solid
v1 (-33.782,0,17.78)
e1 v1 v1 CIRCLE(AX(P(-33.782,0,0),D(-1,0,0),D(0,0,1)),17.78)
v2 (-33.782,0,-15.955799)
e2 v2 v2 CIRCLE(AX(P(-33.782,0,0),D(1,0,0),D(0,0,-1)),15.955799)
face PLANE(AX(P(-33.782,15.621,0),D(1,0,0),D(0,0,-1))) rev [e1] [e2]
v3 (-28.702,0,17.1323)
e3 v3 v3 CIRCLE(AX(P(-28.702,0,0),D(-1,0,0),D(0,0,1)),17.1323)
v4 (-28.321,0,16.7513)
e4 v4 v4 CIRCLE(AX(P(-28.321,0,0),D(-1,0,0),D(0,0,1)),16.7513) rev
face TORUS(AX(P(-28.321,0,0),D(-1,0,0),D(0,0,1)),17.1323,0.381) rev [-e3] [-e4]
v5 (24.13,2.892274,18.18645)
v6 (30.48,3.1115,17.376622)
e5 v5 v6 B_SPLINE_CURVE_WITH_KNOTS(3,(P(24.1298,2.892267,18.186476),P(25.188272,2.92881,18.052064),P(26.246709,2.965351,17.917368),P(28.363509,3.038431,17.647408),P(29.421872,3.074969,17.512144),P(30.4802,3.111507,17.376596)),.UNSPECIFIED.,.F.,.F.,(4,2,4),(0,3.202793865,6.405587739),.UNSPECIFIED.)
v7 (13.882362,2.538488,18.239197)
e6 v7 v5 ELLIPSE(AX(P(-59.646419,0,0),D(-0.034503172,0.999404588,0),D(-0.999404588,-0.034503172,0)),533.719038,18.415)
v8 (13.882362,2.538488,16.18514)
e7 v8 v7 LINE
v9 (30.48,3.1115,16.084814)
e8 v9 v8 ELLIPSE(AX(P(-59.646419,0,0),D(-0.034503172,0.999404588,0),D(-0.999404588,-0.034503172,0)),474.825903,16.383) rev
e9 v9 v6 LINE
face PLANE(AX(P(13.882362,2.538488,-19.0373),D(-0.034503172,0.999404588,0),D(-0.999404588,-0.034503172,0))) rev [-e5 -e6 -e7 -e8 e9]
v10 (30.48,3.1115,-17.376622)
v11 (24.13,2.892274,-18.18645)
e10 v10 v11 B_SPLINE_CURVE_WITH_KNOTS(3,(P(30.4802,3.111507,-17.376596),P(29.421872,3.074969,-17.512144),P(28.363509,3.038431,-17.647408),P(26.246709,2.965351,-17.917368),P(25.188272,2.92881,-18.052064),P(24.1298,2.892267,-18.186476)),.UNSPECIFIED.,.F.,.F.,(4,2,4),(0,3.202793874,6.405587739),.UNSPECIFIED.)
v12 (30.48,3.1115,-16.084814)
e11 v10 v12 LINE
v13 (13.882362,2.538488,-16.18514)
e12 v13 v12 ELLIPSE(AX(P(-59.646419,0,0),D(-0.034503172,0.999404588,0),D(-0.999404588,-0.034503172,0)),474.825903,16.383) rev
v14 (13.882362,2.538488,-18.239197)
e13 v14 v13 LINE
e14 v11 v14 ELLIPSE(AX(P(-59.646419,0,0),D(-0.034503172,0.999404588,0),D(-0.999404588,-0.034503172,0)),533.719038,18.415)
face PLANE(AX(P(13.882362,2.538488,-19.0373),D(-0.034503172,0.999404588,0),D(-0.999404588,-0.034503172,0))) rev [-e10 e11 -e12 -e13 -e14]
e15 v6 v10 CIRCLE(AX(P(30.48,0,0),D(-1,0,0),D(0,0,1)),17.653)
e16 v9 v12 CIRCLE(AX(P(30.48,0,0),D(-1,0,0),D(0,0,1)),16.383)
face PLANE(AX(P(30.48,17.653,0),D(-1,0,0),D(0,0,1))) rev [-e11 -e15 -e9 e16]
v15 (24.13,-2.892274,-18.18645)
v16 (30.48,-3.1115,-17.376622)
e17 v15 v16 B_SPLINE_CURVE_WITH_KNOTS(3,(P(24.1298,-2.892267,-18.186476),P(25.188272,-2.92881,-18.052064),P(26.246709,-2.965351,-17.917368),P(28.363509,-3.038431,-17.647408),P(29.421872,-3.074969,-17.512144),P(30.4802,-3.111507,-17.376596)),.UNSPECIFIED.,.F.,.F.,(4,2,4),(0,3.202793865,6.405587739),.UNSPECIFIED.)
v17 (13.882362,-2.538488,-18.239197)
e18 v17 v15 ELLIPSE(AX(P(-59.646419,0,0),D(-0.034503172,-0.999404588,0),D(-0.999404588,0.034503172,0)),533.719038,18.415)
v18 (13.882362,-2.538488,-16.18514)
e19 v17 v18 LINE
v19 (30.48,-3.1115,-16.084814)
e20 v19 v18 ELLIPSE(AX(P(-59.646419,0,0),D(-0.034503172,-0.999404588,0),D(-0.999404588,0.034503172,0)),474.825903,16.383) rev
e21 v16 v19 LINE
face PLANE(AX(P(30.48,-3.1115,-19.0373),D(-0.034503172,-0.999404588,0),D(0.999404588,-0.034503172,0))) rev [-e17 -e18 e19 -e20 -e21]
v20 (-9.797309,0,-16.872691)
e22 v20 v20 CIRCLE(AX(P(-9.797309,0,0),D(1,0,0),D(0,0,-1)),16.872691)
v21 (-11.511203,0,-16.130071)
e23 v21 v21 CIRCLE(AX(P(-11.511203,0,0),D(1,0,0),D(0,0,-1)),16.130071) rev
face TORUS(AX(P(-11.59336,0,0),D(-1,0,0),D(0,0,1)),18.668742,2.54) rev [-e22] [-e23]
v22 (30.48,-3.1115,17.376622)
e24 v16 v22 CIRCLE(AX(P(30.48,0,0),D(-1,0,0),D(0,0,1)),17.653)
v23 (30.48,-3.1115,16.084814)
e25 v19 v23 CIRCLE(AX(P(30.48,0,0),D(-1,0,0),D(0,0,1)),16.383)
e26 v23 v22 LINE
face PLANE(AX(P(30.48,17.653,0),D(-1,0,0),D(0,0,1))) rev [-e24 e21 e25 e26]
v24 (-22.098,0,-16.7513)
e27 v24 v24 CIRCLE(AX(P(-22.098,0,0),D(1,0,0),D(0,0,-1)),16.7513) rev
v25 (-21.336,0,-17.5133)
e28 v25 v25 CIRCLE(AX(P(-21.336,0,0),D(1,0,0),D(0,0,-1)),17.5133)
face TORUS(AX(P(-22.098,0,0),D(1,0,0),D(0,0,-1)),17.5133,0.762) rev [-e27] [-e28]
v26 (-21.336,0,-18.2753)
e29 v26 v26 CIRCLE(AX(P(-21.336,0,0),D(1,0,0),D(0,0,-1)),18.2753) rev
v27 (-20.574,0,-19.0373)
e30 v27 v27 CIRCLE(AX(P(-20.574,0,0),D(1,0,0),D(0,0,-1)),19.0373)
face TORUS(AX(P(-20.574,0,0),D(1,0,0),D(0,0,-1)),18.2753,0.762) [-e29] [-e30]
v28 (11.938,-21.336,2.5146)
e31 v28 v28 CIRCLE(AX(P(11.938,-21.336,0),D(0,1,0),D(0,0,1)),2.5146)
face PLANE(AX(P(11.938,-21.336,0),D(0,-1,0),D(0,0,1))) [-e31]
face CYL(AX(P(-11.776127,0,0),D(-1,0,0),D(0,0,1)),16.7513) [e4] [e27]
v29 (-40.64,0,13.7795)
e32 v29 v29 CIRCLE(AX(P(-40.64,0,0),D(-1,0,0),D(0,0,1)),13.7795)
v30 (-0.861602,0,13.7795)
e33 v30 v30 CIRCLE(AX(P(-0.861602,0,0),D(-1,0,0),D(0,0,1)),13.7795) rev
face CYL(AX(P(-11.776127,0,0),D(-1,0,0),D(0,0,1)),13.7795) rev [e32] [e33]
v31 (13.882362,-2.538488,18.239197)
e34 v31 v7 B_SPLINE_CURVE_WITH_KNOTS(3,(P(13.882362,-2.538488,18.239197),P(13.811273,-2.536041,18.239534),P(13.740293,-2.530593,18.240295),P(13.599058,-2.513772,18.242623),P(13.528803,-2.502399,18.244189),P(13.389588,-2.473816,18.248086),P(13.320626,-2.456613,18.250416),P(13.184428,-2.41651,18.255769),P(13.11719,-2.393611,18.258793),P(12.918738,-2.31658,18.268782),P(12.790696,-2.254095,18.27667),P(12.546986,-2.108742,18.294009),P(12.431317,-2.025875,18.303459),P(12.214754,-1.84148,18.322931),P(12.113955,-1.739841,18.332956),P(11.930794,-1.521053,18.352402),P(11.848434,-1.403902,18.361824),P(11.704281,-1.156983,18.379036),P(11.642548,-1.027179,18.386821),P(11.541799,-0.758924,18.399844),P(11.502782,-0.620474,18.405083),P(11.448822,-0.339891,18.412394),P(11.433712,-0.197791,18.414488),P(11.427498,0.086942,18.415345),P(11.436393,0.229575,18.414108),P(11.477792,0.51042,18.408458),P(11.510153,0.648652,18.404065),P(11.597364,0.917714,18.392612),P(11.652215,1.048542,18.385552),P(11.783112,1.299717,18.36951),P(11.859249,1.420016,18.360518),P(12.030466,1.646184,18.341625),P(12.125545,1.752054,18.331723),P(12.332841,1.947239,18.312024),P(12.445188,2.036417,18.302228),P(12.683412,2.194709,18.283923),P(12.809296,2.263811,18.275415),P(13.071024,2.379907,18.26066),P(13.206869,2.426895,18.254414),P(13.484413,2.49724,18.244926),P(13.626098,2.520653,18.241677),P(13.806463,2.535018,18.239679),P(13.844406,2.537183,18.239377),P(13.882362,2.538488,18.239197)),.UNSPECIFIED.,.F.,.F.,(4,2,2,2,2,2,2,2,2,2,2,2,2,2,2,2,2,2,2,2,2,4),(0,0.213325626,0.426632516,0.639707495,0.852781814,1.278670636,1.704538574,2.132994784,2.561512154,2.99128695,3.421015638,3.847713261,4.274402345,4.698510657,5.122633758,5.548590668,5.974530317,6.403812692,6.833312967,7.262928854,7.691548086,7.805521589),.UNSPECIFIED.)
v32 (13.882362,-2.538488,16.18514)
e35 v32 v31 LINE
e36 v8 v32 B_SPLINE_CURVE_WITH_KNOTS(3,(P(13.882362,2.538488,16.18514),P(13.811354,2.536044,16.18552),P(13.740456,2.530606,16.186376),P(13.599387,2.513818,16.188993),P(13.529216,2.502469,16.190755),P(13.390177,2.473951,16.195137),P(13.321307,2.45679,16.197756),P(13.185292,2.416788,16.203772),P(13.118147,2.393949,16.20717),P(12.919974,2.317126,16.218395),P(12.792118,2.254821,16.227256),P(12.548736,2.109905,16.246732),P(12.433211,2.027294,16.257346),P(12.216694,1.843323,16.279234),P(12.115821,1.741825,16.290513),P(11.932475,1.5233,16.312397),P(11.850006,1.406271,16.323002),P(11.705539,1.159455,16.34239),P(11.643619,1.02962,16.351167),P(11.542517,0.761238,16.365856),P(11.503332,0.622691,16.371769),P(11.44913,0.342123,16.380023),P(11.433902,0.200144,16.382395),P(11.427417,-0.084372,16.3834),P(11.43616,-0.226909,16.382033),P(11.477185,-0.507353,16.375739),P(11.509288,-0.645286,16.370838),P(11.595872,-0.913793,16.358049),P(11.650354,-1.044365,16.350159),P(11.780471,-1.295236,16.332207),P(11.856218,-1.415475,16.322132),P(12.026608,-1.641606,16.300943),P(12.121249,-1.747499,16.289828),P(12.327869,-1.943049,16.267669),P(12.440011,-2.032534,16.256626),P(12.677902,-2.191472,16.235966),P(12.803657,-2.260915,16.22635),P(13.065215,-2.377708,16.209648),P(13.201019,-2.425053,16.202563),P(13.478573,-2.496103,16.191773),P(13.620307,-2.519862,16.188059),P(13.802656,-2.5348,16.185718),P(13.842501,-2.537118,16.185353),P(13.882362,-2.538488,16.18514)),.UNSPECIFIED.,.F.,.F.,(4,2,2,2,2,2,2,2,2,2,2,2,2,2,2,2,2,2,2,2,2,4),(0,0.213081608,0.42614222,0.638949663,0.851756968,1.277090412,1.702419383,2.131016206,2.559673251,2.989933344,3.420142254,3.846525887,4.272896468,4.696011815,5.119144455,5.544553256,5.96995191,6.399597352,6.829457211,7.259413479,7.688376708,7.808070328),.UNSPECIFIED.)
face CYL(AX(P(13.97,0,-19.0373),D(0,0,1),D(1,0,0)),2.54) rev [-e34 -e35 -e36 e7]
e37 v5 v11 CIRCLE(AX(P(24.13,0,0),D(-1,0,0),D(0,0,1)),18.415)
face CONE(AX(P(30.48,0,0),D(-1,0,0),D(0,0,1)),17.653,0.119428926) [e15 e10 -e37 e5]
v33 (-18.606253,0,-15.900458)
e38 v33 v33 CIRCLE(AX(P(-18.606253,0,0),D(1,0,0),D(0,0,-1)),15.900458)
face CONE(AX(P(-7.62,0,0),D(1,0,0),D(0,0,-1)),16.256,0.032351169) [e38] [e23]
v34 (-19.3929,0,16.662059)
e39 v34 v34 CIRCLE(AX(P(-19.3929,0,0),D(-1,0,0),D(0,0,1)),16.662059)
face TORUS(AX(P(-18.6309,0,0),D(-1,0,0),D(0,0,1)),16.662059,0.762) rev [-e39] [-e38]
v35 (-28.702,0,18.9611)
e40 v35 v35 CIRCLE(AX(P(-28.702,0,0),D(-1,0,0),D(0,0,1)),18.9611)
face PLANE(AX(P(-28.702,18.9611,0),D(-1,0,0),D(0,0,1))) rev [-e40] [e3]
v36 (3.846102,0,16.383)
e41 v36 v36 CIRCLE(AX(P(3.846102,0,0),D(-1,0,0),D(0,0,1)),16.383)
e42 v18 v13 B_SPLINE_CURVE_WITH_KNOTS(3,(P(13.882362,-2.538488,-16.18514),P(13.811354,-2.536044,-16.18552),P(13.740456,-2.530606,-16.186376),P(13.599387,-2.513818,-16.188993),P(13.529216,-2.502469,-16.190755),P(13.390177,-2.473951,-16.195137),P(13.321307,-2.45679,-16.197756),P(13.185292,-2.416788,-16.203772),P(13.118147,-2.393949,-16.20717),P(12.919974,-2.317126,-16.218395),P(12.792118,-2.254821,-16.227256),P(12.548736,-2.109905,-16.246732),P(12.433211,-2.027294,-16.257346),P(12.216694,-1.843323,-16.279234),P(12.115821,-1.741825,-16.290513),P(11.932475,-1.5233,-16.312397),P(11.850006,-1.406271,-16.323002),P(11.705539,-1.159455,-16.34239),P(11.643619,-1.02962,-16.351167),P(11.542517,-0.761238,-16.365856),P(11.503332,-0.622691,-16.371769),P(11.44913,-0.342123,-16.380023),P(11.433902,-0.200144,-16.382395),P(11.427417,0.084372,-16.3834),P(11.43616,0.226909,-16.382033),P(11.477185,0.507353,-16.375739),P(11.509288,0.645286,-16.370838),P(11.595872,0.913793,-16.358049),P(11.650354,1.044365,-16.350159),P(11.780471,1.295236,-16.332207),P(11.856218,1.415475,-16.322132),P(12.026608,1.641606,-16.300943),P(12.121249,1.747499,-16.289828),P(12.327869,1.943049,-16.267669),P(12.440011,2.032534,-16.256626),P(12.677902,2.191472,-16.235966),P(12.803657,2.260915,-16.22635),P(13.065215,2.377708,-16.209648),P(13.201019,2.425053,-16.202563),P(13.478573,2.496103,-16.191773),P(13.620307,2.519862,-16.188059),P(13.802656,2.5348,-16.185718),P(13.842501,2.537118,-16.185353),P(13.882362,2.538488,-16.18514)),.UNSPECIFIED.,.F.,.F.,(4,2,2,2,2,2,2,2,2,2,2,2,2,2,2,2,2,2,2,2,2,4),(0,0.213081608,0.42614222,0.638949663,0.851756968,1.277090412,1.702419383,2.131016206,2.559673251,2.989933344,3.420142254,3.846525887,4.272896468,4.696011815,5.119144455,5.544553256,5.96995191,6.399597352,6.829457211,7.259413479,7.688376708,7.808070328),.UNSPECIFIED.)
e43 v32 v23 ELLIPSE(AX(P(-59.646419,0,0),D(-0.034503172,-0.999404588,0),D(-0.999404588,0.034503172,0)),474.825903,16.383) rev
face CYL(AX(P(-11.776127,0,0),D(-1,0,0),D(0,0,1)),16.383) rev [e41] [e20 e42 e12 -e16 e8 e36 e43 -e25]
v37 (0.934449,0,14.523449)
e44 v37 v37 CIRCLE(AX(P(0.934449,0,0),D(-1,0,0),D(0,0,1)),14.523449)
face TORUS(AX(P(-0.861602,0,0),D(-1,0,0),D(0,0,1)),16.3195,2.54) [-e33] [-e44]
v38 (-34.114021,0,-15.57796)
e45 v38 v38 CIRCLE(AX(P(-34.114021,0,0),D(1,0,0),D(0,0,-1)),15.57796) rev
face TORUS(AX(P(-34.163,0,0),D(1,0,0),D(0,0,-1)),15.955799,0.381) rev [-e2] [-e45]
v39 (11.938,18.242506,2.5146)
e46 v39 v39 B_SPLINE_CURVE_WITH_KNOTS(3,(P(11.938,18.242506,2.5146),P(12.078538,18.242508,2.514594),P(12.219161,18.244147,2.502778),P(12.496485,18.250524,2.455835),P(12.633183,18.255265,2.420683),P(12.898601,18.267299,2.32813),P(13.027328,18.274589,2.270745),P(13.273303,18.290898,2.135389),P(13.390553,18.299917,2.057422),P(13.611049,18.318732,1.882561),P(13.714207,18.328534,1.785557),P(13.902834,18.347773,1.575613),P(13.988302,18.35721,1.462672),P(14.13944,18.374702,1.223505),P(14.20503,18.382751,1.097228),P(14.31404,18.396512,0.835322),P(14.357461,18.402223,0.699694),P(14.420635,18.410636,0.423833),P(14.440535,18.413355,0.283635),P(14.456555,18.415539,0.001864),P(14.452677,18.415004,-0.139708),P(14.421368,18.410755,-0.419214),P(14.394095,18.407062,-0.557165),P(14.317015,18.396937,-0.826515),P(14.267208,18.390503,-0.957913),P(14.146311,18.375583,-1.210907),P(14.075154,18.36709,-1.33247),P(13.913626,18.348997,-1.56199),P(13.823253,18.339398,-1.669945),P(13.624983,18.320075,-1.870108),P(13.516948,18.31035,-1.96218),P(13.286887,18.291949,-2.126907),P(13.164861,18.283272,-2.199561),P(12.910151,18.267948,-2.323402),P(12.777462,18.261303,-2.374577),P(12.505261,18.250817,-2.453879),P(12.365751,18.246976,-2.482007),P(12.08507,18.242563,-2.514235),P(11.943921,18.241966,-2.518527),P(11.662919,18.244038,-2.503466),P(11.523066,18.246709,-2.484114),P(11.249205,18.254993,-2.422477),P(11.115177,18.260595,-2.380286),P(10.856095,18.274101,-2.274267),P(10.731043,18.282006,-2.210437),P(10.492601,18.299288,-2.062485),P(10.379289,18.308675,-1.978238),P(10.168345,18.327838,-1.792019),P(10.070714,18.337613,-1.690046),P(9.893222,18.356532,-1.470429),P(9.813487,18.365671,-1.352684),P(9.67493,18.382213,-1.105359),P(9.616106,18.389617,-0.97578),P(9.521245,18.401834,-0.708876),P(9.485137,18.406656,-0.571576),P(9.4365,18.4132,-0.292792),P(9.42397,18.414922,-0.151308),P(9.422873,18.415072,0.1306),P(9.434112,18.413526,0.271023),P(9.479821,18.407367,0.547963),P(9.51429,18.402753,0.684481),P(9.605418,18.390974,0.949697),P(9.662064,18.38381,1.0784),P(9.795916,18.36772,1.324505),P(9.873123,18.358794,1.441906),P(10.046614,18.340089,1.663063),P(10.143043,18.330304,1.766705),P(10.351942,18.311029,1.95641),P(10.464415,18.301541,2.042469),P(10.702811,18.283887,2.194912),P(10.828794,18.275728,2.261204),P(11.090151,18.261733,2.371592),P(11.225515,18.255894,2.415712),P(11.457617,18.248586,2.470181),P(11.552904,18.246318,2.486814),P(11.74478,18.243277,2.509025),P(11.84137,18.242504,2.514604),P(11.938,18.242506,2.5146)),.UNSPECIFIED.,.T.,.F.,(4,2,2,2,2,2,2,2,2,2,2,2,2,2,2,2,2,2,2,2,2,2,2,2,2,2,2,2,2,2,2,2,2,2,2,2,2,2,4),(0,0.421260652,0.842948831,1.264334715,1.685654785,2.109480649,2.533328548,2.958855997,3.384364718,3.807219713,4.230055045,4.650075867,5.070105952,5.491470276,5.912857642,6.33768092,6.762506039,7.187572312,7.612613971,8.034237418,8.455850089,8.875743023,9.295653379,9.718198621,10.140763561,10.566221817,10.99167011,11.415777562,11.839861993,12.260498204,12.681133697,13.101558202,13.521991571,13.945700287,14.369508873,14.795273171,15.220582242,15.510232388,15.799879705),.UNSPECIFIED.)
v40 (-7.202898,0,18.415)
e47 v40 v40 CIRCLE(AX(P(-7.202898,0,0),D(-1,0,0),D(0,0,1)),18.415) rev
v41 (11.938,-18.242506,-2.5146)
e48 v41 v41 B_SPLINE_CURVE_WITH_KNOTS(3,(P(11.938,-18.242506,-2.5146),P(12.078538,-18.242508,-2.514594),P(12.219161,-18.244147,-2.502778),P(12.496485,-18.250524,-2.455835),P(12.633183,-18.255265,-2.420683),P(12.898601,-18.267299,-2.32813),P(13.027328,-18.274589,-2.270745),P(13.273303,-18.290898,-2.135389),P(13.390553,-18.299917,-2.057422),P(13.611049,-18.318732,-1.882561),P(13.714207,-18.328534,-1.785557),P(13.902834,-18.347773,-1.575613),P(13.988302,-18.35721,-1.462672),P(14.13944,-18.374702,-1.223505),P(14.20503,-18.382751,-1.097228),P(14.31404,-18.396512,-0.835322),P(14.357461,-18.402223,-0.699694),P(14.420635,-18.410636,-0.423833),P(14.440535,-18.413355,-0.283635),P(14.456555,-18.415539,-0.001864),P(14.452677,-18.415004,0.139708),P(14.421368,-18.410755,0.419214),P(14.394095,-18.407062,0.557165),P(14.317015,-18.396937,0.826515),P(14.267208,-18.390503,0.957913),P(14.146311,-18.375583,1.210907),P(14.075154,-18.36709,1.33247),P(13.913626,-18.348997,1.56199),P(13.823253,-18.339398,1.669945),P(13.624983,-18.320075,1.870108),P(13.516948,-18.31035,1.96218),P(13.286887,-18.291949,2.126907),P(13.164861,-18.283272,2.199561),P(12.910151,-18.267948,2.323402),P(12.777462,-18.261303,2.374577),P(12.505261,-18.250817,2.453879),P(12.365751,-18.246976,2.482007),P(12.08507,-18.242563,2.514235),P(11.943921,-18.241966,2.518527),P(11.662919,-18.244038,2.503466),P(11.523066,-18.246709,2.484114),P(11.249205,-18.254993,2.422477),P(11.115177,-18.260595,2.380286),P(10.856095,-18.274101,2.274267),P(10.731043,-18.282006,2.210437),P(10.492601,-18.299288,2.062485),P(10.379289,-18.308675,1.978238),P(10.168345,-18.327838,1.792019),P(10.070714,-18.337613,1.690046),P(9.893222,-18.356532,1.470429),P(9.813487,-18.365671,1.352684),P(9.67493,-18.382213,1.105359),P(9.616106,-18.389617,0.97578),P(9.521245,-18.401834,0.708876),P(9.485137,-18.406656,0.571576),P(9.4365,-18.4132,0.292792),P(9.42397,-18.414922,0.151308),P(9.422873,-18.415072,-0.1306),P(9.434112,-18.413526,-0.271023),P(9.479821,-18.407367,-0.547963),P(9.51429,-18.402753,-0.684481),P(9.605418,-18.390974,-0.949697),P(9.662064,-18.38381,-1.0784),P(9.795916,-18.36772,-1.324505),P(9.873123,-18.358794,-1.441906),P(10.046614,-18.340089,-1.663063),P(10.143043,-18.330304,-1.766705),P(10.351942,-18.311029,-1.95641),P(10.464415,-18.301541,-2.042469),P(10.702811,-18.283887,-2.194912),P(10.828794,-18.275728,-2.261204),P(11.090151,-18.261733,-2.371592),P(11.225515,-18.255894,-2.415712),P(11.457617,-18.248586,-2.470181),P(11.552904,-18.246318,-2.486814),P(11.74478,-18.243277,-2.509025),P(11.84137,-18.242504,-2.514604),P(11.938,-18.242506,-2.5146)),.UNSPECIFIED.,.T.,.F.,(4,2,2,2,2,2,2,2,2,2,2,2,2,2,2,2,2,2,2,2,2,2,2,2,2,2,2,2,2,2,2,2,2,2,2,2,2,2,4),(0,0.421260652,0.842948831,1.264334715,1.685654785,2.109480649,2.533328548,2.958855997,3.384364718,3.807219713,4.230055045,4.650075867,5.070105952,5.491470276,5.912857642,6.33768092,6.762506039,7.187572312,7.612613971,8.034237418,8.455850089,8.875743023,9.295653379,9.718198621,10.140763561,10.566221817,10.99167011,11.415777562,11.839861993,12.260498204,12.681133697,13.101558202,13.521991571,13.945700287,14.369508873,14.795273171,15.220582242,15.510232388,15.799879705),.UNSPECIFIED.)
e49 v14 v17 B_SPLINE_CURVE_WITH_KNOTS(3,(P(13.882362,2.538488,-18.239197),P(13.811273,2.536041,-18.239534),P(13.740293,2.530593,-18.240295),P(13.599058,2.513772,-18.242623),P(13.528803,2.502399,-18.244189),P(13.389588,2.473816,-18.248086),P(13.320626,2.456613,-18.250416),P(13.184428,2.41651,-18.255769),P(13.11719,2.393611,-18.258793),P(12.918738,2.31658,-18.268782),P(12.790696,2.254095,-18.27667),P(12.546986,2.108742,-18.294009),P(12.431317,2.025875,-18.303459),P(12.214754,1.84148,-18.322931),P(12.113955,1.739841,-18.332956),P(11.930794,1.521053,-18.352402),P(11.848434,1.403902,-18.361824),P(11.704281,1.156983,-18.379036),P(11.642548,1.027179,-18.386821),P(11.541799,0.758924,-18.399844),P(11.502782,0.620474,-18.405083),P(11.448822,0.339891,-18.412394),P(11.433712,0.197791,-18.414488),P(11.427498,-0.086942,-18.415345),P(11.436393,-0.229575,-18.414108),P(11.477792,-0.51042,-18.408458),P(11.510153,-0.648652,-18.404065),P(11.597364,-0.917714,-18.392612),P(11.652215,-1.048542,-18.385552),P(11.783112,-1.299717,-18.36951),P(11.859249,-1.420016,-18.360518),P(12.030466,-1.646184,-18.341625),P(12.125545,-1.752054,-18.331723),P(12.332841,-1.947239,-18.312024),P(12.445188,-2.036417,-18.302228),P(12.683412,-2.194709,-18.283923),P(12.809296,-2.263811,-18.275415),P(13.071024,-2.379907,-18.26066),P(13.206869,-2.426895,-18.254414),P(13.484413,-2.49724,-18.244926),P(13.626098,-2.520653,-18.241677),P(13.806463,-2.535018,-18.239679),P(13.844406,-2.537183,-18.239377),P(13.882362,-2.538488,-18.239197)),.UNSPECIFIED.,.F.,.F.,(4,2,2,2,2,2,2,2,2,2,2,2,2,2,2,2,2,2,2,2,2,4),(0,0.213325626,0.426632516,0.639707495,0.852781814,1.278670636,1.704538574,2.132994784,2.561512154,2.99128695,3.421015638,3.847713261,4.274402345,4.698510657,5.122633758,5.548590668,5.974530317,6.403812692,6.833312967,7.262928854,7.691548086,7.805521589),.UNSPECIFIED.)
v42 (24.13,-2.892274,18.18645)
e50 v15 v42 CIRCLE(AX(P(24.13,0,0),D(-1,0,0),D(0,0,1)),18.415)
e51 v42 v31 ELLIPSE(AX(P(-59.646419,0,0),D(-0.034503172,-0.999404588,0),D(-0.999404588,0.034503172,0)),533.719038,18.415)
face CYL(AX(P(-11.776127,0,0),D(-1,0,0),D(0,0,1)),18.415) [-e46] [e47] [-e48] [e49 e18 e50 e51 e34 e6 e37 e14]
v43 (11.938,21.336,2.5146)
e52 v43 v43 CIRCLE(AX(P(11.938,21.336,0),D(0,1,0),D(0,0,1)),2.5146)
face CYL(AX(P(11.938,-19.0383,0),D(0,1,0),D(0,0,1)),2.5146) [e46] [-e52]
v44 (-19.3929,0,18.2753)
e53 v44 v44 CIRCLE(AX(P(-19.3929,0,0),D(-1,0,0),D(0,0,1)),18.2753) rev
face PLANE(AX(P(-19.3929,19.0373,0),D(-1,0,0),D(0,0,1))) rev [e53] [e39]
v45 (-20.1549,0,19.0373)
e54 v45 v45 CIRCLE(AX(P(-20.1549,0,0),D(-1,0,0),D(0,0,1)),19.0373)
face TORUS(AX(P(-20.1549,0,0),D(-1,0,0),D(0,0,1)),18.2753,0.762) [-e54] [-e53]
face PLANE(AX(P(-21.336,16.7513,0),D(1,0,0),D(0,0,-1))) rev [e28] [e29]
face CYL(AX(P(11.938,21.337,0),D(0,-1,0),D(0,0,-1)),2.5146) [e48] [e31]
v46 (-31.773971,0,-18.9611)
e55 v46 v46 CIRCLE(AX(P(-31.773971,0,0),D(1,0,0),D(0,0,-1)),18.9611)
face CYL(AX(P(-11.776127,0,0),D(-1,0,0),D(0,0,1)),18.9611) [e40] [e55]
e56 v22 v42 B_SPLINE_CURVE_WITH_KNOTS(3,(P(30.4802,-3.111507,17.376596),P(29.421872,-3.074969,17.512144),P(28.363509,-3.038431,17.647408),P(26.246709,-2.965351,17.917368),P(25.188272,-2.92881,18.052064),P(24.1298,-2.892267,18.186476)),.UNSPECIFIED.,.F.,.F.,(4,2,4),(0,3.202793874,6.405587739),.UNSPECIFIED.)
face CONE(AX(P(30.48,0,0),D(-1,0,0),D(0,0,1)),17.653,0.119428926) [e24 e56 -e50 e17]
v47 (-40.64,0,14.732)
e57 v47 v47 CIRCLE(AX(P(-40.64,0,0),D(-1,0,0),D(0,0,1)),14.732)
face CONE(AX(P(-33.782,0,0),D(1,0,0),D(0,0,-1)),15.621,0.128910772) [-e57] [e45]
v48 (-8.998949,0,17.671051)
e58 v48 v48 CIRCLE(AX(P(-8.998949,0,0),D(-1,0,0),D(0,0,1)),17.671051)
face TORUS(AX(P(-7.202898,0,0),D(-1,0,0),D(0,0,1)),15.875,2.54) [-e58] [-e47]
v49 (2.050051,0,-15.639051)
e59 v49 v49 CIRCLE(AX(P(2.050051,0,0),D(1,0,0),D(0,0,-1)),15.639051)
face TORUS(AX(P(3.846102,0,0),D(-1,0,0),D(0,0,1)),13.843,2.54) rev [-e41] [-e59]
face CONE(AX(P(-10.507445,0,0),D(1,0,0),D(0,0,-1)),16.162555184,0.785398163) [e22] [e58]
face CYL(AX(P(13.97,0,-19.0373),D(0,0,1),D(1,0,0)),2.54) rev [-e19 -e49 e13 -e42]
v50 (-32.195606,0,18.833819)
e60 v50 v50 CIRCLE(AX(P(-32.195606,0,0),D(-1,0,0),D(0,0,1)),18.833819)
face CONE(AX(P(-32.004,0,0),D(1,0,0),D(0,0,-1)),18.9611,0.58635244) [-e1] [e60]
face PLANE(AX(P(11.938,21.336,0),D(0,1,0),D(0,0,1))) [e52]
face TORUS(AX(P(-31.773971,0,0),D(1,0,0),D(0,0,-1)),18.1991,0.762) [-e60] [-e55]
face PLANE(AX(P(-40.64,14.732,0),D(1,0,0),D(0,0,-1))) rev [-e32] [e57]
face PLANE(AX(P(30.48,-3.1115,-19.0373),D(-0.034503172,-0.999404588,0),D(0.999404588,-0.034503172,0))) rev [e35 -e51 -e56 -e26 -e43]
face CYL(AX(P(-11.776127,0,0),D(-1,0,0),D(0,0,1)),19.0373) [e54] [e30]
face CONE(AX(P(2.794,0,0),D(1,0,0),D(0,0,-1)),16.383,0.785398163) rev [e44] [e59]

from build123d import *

# Parameters (mm, degrees)
CUT_EXTRUDE3_DEPTH       = 49.748817243
CUT_EXTRUDE3_DEPTH_BACK  = 49.748817243
BOSS_EXTRUDE1_REACH      = 62.366
BOSS_EXTRUDE1_END_RADIUS = 18.415
SKETCH3_R                = 2.5146
FILLET1_R                = 0.762
CHAMFER1_SIZE            = 2.794
CHAMFER1_SIZE_2          = 2.888956472
FILLET2_R                = 0.381
FILLET3_R                = 2.54


with BuildPart() as part:
    # Sketch1 → Revolve1 (revolve)
    with BuildSketch(Plane.XY, mode=Mode.PRIVATE) as revolve1_sk:
        Polygon((-40.64, 13.7795), (0, 13.7795), (0, 16.383), (30.48, 16.383), (30.48, 17.653), (24.13, 18.415), (-7.62, 18.415), (-7.62, 16.256), (-19.3929, 15.875), (-19.3929, 19.0373), (-21.336, 19.0373), (-21.336, 16.7513), (-28.702, 16.7513), (-28.702, 18.9611), (-32.004, 18.9611), (-33.782, 17.78), (-33.782, 15.621), (-40.64, 14.732), align=None)
    revolve(revolve1_sk.sketch.rotate(Axis((-11.776127049, 0, 0), (1, 0, 0)), 90), axis=Axis((-11.776127049, 0, 0), (1, 0, 0)))

    # Sketch2 → Cut-Extrude3 (cut, two sides: drawn at the far end of the back side and taken through both)
    with BuildSketch(Plane.XY.offset(-CUT_EXTRUDE3_DEPTH_BACK)):
        with BuildLine():
            Line((13.882361942, 2.538487654), (30.48, 3.1115))
            Line((30.48, 3.1115), (30.48, -3.1115))
            Line((30.48, -3.1115), (13.882361942, -2.538487654))
            ThreePointArc((13.882361942, -2.538487654), (11.43, 0), (13.882361942, 2.538487654))
        make_face()
    extrude(amount=CUT_EXTRUDE3_DEPTH + CUT_EXTRUDE3_DEPTH_BACK, mode=Mode.SUBTRACT)

    # Boss-Extrude1: up to this cylinder (the profile starts outside it)
    boss_extrude1_end = Plane(origin=(11.938, 0, 0), z_dir=(-1, 0, 0)) * Cylinder(BOSS_EXTRUDE1_END_RADIUS, 162.562, mode=Mode.PRIVATE)
    # Sketch3 → Boss-Extrude1 (add, up to the surface)
    with BuildSketch(Plane(origin=(0, 21.336, 0), x_dir=(1, 0, 0), z_dir=(0, 1, 0)), mode=Mode.PRIVATE) as boss_extrude1_sk1:
        with Locations(Location((11.938, 0, 0), (0, 0, 270))):
            Circle(SKETCH3_R)
    boss_extrude1_tool1 = extrude(boss_extrude1_sk1.sketch, amount=-BOSS_EXTRUDE1_REACH, mode=Mode.PRIVATE) - boss_extrude1_end
    boss_extrude1 = boss_extrude1_tool1.solids().sort_by_distance((11.938, 21.336, 0))[0]
    add(boss_extrude1)

    # Mirror1: Boss-Extrude1 across plane
    add(boss_extrude1.mirror(Plane.ZX))

    # Fillet1
    fillet1_edges = [part.edges().sort_by_distance(p)[0] for p in [
        (-32.004, 0, -18.9611),
        (-21.336, 0, -16.7513),
        (-21.336, 0, -19.0373),
        (-19.3929, 0, -19.0373),
        (-19.3929, 0, -15.875),
    ]]
    fillet(fillet1_edges, radius=FILLET1_R)

    # Chamfer1
    # the kernel refuses this chamfer: 2.888956472, 2.794 mm, written as the material it adds along each edge
    with BuildSketch(Plane(origin=(0, 0, 0), x_dir=(0, 0, 1), z_dir=(0, 1, 0))) as chamfer1_piece_1_section:
        Polygon((16.383 - CHAMFER1_SIZE, 0), (16.383, CHAMFER1_SIZE), (16.383, 0), align=None)
    chamfer1_piece_1 = revolve(axis=Axis((0, 0, 0), (1, 0, 0)), mode=Mode.PRIVATE)
    chamfer1_piece_1 = chamfer1_piece_1 - Plane(origin=(1.479100002, 0, 0), x_dir=(0, 0, 1), z_dir=(1, 0, 0)) * Cylinder(13.7795, 66, mode=Mode.PRIVATE)
    with BuildSketch(Plane(origin=(-7.62, 0, 0), x_dir=(0, 0, 1), z_dir=(0, 1, 0))) as chamfer1_piece_2_section:
        Polygon((16.256 + CHAMFER1_SIZE, 0), (16.256 - CHAMFER1_SIZE_2 * 0.0323455257839, -CHAMFER1_SIZE_2 * 0.999476746721), (16.256, 0), align=None)
    chamfer1_piece_2 = revolve(axis=Axis((-7.62, 0, 0), (1, 0, 0)), mode=Mode.PRIVATE)
    chamfer1_piece_2 = chamfer1_piece_2 & Plane(origin=(-9.368047324, 0, 0), x_dir=(0, 0, 1), z_dir=(-1, 0, 0)) * Cylinder(18.415, 77, mode=Mode.PRIVATE)
    add([chamfer1_piece_1, chamfer1_piece_2])

    # Fillet2
    fillet2_edges = [part.edges().sort_by_distance(p)[0] for p in [
        (-33.782, 0, -15.621),
        (-28.702, 0, -16.7513),
    ]]
    fillet(fillet2_edges, radius=FILLET2_R)

    # Fillet3
    fillet3_edges = [part.edges().sort_by_distance(p)[0] for p in [
        (-10.507444816, 0, -16.162555184),
        (2.794, 0, -16.383),
        (-8.255, 0, -18.415),
        (0.1905, 0, -13.7795),
    ]]
    fillet(fillet3_edges, radius=FILLET3_R)


solid = part.part
